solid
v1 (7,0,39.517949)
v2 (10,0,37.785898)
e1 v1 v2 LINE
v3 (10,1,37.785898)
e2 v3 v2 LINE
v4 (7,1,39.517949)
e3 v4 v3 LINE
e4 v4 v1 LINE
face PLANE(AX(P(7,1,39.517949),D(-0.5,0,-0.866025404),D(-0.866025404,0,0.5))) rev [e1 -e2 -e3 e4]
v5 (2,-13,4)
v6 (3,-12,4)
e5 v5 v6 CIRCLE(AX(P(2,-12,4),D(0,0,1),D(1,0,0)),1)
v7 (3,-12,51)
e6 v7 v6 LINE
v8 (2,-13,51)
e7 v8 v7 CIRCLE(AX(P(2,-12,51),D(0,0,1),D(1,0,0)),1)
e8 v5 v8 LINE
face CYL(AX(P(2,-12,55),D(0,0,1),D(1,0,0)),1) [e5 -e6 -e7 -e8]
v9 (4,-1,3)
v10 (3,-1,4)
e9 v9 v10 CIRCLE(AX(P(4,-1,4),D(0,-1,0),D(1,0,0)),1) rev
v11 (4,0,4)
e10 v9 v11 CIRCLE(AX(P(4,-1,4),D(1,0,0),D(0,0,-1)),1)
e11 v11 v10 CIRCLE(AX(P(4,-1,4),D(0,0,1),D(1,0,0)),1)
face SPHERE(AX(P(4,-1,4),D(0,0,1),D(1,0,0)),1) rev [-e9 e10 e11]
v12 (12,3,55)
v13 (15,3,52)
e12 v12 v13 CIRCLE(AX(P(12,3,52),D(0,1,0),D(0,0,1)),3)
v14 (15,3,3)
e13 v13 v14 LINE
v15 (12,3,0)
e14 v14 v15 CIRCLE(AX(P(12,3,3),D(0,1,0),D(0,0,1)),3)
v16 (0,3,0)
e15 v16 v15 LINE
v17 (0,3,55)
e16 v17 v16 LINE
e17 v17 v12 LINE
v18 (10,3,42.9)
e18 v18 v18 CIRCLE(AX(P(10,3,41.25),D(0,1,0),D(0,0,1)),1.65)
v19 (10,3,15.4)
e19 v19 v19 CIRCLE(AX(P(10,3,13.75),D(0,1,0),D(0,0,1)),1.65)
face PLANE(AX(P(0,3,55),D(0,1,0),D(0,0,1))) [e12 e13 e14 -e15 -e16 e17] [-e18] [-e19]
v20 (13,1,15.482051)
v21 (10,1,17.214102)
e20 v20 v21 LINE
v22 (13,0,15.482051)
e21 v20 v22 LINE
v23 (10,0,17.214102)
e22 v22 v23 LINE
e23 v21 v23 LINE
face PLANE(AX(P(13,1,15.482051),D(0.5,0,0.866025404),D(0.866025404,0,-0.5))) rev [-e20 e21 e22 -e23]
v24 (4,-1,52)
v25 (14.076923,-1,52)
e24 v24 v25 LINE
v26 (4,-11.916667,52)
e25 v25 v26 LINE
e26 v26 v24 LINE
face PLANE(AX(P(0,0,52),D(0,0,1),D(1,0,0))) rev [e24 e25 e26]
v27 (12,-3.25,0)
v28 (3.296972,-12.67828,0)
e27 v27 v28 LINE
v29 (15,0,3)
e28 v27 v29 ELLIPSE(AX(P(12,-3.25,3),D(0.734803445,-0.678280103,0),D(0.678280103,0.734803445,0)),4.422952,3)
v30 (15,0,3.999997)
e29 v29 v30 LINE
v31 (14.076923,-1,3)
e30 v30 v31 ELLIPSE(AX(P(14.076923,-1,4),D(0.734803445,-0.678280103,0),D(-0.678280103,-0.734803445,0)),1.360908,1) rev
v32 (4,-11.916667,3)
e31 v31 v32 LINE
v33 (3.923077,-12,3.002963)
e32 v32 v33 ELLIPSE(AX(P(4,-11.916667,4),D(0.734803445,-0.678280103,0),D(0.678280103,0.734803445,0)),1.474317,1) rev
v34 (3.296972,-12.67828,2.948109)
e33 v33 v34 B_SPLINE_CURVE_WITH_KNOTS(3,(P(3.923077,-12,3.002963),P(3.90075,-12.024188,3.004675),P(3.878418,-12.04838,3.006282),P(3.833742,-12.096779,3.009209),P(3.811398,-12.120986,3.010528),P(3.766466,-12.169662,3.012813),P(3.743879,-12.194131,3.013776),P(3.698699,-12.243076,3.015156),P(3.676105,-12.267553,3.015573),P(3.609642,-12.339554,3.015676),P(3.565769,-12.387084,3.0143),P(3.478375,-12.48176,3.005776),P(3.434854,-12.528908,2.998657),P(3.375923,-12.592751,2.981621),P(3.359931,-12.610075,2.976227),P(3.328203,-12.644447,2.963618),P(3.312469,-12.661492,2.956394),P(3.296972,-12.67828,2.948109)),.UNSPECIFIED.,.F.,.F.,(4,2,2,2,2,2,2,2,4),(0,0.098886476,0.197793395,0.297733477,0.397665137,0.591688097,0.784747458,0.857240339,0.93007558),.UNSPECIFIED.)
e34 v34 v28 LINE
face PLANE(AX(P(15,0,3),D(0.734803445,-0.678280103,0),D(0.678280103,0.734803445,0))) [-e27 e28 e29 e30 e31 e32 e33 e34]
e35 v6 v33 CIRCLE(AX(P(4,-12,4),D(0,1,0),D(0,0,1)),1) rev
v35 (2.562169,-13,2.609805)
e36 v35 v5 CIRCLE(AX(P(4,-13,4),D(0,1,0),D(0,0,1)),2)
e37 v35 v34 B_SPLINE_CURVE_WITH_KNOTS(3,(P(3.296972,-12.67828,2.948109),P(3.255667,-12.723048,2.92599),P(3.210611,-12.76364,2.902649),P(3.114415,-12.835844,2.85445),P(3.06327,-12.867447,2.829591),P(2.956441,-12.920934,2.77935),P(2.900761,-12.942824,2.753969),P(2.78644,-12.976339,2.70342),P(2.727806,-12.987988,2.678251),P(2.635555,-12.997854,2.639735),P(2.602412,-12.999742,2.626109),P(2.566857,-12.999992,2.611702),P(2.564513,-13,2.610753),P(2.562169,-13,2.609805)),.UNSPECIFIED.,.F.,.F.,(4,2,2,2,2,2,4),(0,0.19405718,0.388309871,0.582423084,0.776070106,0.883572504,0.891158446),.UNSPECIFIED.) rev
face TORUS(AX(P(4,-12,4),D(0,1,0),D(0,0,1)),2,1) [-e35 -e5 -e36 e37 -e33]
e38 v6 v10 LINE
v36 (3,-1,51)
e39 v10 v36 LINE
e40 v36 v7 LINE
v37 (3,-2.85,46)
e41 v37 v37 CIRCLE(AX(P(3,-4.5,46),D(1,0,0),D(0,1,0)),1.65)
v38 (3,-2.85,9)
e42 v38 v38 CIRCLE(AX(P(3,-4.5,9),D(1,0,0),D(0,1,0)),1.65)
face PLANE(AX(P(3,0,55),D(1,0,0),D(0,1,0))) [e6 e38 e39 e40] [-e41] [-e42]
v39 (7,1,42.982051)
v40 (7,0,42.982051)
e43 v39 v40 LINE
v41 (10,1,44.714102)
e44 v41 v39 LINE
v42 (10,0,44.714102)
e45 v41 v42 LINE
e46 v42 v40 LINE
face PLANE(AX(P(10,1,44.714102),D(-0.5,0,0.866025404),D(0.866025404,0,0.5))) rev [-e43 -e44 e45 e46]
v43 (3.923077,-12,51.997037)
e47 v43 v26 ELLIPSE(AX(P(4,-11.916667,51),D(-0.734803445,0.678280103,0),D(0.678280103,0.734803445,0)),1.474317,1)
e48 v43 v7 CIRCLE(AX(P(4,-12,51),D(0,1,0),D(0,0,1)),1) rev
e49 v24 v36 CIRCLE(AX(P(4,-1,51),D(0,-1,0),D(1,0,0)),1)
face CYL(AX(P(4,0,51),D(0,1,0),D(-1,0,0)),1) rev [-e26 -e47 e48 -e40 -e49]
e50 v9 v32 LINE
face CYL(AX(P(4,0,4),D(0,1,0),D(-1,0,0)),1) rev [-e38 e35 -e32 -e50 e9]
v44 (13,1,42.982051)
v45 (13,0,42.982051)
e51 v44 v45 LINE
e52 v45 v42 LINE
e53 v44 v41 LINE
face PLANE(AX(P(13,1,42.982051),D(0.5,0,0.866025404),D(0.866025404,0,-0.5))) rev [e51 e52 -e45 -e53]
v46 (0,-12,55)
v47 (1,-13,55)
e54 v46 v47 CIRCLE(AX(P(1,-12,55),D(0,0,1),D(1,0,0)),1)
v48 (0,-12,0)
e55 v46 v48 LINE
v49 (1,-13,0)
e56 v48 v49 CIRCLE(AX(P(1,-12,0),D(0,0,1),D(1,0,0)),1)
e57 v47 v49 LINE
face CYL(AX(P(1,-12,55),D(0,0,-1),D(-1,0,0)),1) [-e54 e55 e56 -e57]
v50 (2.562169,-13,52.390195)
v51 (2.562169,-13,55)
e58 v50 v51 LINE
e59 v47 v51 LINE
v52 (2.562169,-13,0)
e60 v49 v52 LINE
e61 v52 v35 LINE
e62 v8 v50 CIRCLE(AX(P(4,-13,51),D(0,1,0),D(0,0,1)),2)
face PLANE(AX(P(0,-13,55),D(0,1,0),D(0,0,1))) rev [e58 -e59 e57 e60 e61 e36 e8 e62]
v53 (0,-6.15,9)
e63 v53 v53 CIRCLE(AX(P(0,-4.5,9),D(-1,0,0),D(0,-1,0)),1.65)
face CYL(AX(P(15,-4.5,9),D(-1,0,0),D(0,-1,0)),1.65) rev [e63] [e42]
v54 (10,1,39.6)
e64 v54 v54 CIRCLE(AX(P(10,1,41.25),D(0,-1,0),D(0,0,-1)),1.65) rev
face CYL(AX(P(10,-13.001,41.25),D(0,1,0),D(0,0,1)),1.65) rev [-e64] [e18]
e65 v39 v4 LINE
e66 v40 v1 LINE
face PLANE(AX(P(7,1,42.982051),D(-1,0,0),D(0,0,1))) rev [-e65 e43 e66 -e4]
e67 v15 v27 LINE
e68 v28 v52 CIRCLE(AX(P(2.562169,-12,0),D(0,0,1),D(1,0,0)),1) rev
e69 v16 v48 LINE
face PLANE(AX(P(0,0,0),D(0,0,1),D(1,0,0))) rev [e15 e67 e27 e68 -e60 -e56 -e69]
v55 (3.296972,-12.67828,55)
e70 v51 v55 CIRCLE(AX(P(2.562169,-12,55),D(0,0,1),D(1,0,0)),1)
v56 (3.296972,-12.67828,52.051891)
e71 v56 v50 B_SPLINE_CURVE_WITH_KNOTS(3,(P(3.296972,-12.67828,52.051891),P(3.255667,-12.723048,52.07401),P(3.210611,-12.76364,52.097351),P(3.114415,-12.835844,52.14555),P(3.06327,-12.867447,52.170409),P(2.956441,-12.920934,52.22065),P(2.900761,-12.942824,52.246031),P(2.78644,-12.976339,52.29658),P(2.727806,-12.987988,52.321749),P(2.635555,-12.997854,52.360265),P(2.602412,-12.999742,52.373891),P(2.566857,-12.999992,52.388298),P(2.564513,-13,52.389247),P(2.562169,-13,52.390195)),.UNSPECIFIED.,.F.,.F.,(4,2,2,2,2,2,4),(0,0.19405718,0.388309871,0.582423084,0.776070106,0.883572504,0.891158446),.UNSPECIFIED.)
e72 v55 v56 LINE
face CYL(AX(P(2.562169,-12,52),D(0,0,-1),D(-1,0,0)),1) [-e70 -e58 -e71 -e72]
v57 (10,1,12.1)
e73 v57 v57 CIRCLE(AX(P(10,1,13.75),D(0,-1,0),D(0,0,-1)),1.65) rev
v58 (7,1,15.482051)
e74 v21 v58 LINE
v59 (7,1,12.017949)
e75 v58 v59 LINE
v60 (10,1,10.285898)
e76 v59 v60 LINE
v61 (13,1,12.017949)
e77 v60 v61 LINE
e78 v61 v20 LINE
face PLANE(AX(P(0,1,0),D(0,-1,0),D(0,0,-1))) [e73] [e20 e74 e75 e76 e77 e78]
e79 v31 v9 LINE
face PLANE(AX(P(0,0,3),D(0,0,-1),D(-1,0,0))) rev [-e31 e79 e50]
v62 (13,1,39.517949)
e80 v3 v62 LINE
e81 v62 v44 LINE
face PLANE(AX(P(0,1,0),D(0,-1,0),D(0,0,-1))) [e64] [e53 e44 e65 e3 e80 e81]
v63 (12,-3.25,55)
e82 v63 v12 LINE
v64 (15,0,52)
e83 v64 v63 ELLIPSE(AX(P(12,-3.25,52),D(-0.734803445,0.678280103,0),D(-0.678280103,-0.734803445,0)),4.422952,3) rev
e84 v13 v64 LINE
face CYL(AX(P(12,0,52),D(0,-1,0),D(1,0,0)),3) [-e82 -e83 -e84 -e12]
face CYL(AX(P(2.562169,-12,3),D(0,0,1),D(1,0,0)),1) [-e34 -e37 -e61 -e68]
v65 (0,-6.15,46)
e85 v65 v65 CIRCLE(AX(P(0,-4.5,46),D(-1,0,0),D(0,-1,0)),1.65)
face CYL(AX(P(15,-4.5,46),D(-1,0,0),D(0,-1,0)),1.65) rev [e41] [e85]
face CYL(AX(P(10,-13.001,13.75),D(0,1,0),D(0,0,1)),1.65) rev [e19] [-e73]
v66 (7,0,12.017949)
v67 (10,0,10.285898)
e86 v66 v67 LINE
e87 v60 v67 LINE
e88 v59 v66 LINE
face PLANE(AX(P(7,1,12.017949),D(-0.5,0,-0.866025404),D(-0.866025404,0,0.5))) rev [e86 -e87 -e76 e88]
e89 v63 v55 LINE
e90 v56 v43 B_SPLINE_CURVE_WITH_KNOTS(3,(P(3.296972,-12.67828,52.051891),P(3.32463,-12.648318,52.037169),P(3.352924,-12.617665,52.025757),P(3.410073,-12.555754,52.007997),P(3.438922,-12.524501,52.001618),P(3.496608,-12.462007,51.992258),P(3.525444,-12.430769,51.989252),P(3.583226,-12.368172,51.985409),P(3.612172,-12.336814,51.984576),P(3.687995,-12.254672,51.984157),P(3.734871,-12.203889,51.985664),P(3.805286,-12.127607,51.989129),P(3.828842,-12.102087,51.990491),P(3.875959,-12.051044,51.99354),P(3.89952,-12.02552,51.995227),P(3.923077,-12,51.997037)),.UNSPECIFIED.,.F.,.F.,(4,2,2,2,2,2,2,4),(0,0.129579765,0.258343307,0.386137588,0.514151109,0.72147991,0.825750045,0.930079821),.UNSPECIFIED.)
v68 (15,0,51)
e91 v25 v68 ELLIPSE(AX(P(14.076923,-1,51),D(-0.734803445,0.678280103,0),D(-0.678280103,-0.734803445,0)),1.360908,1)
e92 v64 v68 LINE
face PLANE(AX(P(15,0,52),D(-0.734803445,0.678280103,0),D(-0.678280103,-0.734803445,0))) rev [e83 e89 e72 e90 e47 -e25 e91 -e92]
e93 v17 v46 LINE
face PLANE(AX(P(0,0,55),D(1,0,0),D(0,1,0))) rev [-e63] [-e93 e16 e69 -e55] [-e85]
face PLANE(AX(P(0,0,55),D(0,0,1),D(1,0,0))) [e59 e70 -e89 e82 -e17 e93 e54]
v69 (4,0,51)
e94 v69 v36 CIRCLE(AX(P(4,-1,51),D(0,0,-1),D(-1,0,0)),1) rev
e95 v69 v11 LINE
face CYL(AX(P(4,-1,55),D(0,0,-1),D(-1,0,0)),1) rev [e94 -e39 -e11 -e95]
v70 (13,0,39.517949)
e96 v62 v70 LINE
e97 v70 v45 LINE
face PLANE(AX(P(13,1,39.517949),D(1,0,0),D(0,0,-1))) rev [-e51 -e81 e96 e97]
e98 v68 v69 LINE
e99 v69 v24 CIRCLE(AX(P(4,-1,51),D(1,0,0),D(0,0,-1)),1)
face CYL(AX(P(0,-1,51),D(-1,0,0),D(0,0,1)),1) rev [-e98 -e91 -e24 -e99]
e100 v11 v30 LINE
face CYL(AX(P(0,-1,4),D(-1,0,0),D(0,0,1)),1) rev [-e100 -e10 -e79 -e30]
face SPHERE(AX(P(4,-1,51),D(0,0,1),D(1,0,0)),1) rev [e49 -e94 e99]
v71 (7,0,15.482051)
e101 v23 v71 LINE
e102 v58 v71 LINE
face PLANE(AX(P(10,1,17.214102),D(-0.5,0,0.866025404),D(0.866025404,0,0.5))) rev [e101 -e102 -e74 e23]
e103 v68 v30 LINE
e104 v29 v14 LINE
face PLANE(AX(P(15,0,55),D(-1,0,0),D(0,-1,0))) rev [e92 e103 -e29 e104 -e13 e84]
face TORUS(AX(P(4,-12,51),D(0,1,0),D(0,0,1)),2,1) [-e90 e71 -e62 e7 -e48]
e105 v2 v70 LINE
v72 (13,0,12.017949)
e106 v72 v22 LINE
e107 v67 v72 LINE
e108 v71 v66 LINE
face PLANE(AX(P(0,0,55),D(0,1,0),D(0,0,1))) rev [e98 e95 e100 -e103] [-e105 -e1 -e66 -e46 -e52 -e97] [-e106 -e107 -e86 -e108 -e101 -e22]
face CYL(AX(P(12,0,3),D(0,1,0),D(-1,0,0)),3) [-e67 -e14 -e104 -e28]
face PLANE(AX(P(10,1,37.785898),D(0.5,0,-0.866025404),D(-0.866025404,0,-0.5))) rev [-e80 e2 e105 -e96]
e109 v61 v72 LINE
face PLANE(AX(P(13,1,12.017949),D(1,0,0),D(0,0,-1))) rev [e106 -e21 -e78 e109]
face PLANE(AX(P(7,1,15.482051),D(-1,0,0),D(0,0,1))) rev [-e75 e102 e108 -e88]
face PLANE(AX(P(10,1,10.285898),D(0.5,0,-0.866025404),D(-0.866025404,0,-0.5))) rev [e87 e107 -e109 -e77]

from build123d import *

# Parameters (mm, degrees)
ESQUISSE2_W             = 15
ESQUISSE2_H             = 3
BOSS_EXTRU_1_DEPTH      = 55
BOSS_EXTRU_2_DEPTH      = 3
BOSS_EXTRU_3_DEPTH      = 3
CONG_1_R                = 3
CONG_2_R                = 1
CONG_3_START            = 4
CONG_3_3_DEPTH          = 47
CONG_3_START_2          = -1
CONG_3_4_DEPTH          = 57
ENL_V_MAT_EXTRU_1_REACH = 61.211
ESQUISSE5_R             = 1.65
ENL_V_MAT_EXTRU_2_DEPTH = 1
ESQUISSE8_R             = 1.65
ENL_V_MAT_EXTRU_3_DEPTH = 59.472215766


with BuildPart() as part:
    # Esquisse2 → Boss.-Extru.1 (new body)
    with BuildSketch(Plane.XY):
        with BuildLine():
            Line((3, 0), (0, 0))
            Line((0, 0), (0, -12))
            ThreePointArc((0, -12), (0.292893219, -12.707106781), (1, -13))
            Line((1, -13), (3, -13))
            Line((3, -13), (3, 0))
        make_face()
        with Locations((7.5, 1.5)):
            Rectangle(ESQUISSE2_W, ESQUISSE2_H)
    extrude(amount=BOSS_EXTRU_1_DEPTH)

    # Esquisse3 → Boss.-Extru.2 (add)
    with BuildSketch(Plane(origin=(3, 0, 55), x_dir=(-1, 0, 0), z_dir=(0, 0, -1))):
        Polygon((-12, 0), (0, -13), (0, 0), align=None)
    extrude(amount=BOSS_EXTRU_2_DEPTH)

    # Esquisse4 → Boss.-Extru.3 (add)
    with BuildSketch(Plane(origin=(3, 0, 0), x_dir=(-1, 0, 0), z_dir=(0, 0, -1))):
        Polygon((0, 0), (-12, 0), (0, -13), align=None)
    extrude(amount=-BOSS_EXTRU_3_DEPTH)

    # Congé1
    cong_1_edges = [part.edges().sort_by_distance(p)[0] for p in [
        (15, 1.5, 0),
        (15, 1.5, 55),
    ]]
    fillet(cong_1_edges, radius=CONG_1_R)

    # Congé2
    # the kernel refuses this fillet: 1 mm, written as the material it adds along each edge
    with BuildSketch(Plane(origin=(4, -1, 4), x_dir=(0, 1, 0), z_dir=(-1, 0, 0))) as cong_2_piece_1_section:
        Polygon((0, 0), (CONG_2_R, 0), (CONG_2_R, CONG_2_R), (0, CONG_2_R), align=None)
    cong_2_piece_1 = extrude(amount=CONG_2_R, mode=Mode.PRIVATE)
    cong_2_piece_1 = cong_2_piece_1 - Plane(origin=(4, -1, 4), x_dir=(0, -0.7071067811865475, 0.7071067811865475), z_dir=(-1, 0, 0)) * Sphere(CONG_2_R, mode=Mode.PRIVATE)
    add(cong_2_piece_1)
    with BuildSketch(Plane(origin=(4, -1, 51), x_dir=(0, 1, 0), z_dir=(-1, 0, 0))) as cong_2_piece_2_section:
        Polygon((0, 0), (CONG_2_R, 0), (CONG_2_R, -CONG_2_R), (0, -CONG_2_R), align=None)
    cong_2_piece_2 = extrude(amount=CONG_2_R, mode=Mode.PRIVATE)
    cong_2_piece_2 = cong_2_piece_2 - Plane(origin=(4, -1, 51), x_dir=(0, -0.7071067811865475, -0.7071067811865475), z_dir=(-1, 0, 0)) * Sphere(CONG_2_R, mode=Mode.PRIVATE)
    add(cong_2_piece_2)
    with BuildSketch(Plane(origin=(3, 0, 4), x_dir=(0, -1, 0), z_dir=(0, 0, 1))) as cong_2_piece_3:
        with BuildLine():
            CenterArc((CONG_2_R, CONG_2_R), CONG_2_R, 180, 90)
            Line((0, CONG_2_R), (0, 0))
            Line((0, 0), (CONG_2_R, 0))
        make_face()
    extrude(amount=47)
    with BuildSketch(Plane(origin=(4, 0, 52), x_dir=(0, 0, -1), z_dir=(1, 0, 0))) as cong_2_piece_4_section:
        with BuildLine():
            CenterArc((CONG_2_R, -CONG_2_R), CONG_2_R, 90, 90)
            Line((0, -CONG_2_R), (0, 0))
            Line((0, 0), (CONG_2_R, 0))
        make_face()
    cong_2_piece_4 = extrude(amount=11, mode=Mode.PRIVATE)
    cong_2_piece_4 = split(cong_2_piece_4, bisect_by=Plane(origin=(9.939297125, -5.482428115, 52), z_dir=(-0.7348034446274879, 0.6782801027330657, 0)), keep=Keep.TOP, mode=Mode.PRIVATE)
    add(cong_2_piece_4)
    with BuildSketch(Plane(origin=(3, -13, 52), x_dir=(0, 0, -1), z_dir=(0, 1, 0))) as cong_2_piece_5_section:
        with BuildLine():
            CenterArc((CONG_2_R, -CONG_2_R), CONG_2_R, 90, 90)
            Line((0, -CONG_2_R), (0, 0))
            Line((0, 0), (CONG_2_R, 0))
        make_face()
    cong_2_piece_5 = extrude(amount=12, mode=Mode.PRIVATE)
    cong_2_piece_5 = split(cong_2_piece_5, bisect_by=Plane(origin=(3, -13, 52), z_dir=(-0.7348034446274879, 0.6782801027330657, 0)), keep=Keep.TOP, mode=Mode.PRIVATE)
    add(cong_2_piece_5)
    with BuildSketch(Plane(origin=(3, -13, 3), x_dir=(1, 0, 0), z_dir=(0, 1, 0))) as cong_2_piece_6_section:
        with BuildLine():
            CenterArc((CONG_2_R, -CONG_2_R), CONG_2_R, 90, 90)
            Line((0, -CONG_2_R), (0, 0))
            Line((0, 0), (CONG_2_R, 0))
        make_face()
    cong_2_piece_6 = extrude(amount=12, mode=Mode.PRIVATE)
    cong_2_piece_6 = split(cong_2_piece_6, bisect_by=Plane(origin=(3, -13, 3), z_dir=(-0.7348034446274879, 0.6782801027330657, 0)), keep=Keep.TOP, mode=Mode.PRIVATE)
    add(cong_2_piece_6)
    with BuildSketch(Plane(origin=(4, 0, 3), x_dir=(0, -1, 0), z_dir=(1, 0, 0))) as cong_2_piece_7_section:
        with BuildLine():
            CenterArc((CONG_2_R, -CONG_2_R), CONG_2_R, 90, 90)
            Line((0, -CONG_2_R), (0, 0))
            Line((0, 0), (CONG_2_R, 0))
        make_face()
    cong_2_piece_7 = extrude(amount=11, mode=Mode.PRIVATE)
    cong_2_piece_7 = split(cong_2_piece_7, bisect_by=Plane(origin=(9.939297125, -5.482428115, 3), z_dir=(-0.7348034446274879, 0.6782801027330657, 0)), keep=Keep.TOP, mode=Mode.PRIVATE)
    add(cong_2_piece_7)

    # Congé3: read off the stored shape, not the designer's step
    # Congé3 outline → Congé3 (revolve, cut)
    with BuildSketch(Plane(origin=(4, 0, 51), x_dir=(1, 0, 0), z_dir=(0, 0, 1))):
        with BuildLine():
            ThreePointArc((2, -13), (1.292893219, -12.707106781), (1, -12))
            Line((1, -12), (1, -13))
            Line((1, -13), (2, -13))
        make_face()
    revolve(axis=Axis((4, 0, 51), (0, 1, 0)), mode=Mode.SUBTRACT)

    # Cong_3 2 outline → Cong_3 2 (revolve, cut)
    with BuildSketch(Plane(origin=(4, 0, 4), x_dir=(1, 0, 0), z_dir=(0, 0, 1))):
        with BuildLine():
            ThreePointArc((2, -13), (1.292893219, -12.707106781), (1, -12))
            Line((1, -12), (1, -13))
            Line((1, -13), (2, -13))
        make_face()
    revolve(axis=Axis((4, 0, 4), (0, 1, 0)), mode=Mode.SUBTRACT)

    # Cong_3 3 outline → Cong_3 3 (cut)
    with BuildSketch(Plane.XY.offset(CONG_3_START)):
        with BuildLine():
            Line((2, -13), (3, -13))
            Line((3, -13), (3, -12))
            ThreePointArc((3, -12), (2.707106781, -12.707106781), (2, -13))
        make_face()
    extrude(amount=CONG_3_3_DEPTH, mode=Mode.SUBTRACT)

    # Cong_3 4 outline → Cong_3 4 (cut)
    with BuildSketch(Plane.XY.offset(CONG_3_START_2)):
        with BuildLine():
            Line((2.562168768, -13), (3, -13))
            Line((3, -13), (3.296972213, -12.678280103))
            ThreePointArc((3.296972213, -12.678280103), (2.963242263, -12.916045878), (2.562168768, -13))
        make_face()
    extrude(amount=CONG_3_4_DEPTH, mode=Mode.SUBTRACT)

    # Esquisse5 → Enlèv. mat.-Extru.1 (cut, up to next)
    with BuildSketch(Plane(origin=(0, 3, 0), x_dir=(1, 0, 0), z_dir=(0, 1, 0)), mode=Mode.PRIVATE) as enl_v_mat_extru_1_sk1:
        with Locations(Location((10, -41.25, 0), (0, 0, 270))):
            Circle(ESQUISSE5_R)
    enl_v_mat_extru_1_tool1 = extrude(enl_v_mat_extru_1_sk1.sketch, amount=-ENL_V_MAT_EXTRU_1_REACH, mode=Mode.PRIVATE) & part.part
    # Esquisse5 → Enlèv. mat.-Extru.1 (cut, up to next)
    with BuildSketch(Plane(origin=(0, 3, 0), x_dir=(1, 0, 0), z_dir=(0, 1, 0)), mode=Mode.PRIVATE) as enl_v_mat_extru_1_sk2:
        with Locations(Location((10, -13.75, 0), (0, 0, 270))):
            Circle(ESQUISSE5_R)
    enl_v_mat_extru_1_tool2 = extrude(enl_v_mat_extru_1_sk2.sketch, amount=-ENL_V_MAT_EXTRU_1_REACH, mode=Mode.PRIVATE) & part.part
    add(enl_v_mat_extru_1_tool1.solids().sort_by_distance((10, 3, 41.25))[0], mode=Mode.SUBTRACT)
    add(enl_v_mat_extru_1_tool2.solids().sort_by_distance((10, 3, 13.75))[0], mode=Mode.SUBTRACT)

    # Esquisse7 → Enlèv. mat.-Extru.2 (cut)
    with BuildSketch(Plane(origin=(0, 0, 0), x_dir=(-1, 0, 0), z_dir=(0, -1, 0))):
        Polygon((-10, -37.785898385), (-13, -39.517949192), (-13, -42.982050808), (-10, -44.714101615), (-7, -42.982050808), (-7, -39.517949192), align=None)
        Polygon((-10, -10.285898385), (-13, -12.017949192), (-13, -15.482050808), (-10, -17.214101615), (-7, -15.482050808), (-7, -12.017949192), align=None)
    extrude(amount=-ENL_V_MAT_EXTRU_2_DEPTH, mode=Mode.SUBTRACT)

    # Esquisse8 → Enlèv. mat.-Extru.3 (cut, through all)
    with BuildSketch(Plane.ZY):
        with Locations(Location((46, -4.5, 0), (0, 0, 270))):
            Circle(ESQUISSE8_R)
        with Locations(Location((9, -4.5, 0), (0, 0, 270))):
            Circle(ESQUISSE8_R)
    extrude(amount=-ENL_V_MAT_EXTRU_3_DEPTH, mode=Mode.SUBTRACT)


solid = part.part
